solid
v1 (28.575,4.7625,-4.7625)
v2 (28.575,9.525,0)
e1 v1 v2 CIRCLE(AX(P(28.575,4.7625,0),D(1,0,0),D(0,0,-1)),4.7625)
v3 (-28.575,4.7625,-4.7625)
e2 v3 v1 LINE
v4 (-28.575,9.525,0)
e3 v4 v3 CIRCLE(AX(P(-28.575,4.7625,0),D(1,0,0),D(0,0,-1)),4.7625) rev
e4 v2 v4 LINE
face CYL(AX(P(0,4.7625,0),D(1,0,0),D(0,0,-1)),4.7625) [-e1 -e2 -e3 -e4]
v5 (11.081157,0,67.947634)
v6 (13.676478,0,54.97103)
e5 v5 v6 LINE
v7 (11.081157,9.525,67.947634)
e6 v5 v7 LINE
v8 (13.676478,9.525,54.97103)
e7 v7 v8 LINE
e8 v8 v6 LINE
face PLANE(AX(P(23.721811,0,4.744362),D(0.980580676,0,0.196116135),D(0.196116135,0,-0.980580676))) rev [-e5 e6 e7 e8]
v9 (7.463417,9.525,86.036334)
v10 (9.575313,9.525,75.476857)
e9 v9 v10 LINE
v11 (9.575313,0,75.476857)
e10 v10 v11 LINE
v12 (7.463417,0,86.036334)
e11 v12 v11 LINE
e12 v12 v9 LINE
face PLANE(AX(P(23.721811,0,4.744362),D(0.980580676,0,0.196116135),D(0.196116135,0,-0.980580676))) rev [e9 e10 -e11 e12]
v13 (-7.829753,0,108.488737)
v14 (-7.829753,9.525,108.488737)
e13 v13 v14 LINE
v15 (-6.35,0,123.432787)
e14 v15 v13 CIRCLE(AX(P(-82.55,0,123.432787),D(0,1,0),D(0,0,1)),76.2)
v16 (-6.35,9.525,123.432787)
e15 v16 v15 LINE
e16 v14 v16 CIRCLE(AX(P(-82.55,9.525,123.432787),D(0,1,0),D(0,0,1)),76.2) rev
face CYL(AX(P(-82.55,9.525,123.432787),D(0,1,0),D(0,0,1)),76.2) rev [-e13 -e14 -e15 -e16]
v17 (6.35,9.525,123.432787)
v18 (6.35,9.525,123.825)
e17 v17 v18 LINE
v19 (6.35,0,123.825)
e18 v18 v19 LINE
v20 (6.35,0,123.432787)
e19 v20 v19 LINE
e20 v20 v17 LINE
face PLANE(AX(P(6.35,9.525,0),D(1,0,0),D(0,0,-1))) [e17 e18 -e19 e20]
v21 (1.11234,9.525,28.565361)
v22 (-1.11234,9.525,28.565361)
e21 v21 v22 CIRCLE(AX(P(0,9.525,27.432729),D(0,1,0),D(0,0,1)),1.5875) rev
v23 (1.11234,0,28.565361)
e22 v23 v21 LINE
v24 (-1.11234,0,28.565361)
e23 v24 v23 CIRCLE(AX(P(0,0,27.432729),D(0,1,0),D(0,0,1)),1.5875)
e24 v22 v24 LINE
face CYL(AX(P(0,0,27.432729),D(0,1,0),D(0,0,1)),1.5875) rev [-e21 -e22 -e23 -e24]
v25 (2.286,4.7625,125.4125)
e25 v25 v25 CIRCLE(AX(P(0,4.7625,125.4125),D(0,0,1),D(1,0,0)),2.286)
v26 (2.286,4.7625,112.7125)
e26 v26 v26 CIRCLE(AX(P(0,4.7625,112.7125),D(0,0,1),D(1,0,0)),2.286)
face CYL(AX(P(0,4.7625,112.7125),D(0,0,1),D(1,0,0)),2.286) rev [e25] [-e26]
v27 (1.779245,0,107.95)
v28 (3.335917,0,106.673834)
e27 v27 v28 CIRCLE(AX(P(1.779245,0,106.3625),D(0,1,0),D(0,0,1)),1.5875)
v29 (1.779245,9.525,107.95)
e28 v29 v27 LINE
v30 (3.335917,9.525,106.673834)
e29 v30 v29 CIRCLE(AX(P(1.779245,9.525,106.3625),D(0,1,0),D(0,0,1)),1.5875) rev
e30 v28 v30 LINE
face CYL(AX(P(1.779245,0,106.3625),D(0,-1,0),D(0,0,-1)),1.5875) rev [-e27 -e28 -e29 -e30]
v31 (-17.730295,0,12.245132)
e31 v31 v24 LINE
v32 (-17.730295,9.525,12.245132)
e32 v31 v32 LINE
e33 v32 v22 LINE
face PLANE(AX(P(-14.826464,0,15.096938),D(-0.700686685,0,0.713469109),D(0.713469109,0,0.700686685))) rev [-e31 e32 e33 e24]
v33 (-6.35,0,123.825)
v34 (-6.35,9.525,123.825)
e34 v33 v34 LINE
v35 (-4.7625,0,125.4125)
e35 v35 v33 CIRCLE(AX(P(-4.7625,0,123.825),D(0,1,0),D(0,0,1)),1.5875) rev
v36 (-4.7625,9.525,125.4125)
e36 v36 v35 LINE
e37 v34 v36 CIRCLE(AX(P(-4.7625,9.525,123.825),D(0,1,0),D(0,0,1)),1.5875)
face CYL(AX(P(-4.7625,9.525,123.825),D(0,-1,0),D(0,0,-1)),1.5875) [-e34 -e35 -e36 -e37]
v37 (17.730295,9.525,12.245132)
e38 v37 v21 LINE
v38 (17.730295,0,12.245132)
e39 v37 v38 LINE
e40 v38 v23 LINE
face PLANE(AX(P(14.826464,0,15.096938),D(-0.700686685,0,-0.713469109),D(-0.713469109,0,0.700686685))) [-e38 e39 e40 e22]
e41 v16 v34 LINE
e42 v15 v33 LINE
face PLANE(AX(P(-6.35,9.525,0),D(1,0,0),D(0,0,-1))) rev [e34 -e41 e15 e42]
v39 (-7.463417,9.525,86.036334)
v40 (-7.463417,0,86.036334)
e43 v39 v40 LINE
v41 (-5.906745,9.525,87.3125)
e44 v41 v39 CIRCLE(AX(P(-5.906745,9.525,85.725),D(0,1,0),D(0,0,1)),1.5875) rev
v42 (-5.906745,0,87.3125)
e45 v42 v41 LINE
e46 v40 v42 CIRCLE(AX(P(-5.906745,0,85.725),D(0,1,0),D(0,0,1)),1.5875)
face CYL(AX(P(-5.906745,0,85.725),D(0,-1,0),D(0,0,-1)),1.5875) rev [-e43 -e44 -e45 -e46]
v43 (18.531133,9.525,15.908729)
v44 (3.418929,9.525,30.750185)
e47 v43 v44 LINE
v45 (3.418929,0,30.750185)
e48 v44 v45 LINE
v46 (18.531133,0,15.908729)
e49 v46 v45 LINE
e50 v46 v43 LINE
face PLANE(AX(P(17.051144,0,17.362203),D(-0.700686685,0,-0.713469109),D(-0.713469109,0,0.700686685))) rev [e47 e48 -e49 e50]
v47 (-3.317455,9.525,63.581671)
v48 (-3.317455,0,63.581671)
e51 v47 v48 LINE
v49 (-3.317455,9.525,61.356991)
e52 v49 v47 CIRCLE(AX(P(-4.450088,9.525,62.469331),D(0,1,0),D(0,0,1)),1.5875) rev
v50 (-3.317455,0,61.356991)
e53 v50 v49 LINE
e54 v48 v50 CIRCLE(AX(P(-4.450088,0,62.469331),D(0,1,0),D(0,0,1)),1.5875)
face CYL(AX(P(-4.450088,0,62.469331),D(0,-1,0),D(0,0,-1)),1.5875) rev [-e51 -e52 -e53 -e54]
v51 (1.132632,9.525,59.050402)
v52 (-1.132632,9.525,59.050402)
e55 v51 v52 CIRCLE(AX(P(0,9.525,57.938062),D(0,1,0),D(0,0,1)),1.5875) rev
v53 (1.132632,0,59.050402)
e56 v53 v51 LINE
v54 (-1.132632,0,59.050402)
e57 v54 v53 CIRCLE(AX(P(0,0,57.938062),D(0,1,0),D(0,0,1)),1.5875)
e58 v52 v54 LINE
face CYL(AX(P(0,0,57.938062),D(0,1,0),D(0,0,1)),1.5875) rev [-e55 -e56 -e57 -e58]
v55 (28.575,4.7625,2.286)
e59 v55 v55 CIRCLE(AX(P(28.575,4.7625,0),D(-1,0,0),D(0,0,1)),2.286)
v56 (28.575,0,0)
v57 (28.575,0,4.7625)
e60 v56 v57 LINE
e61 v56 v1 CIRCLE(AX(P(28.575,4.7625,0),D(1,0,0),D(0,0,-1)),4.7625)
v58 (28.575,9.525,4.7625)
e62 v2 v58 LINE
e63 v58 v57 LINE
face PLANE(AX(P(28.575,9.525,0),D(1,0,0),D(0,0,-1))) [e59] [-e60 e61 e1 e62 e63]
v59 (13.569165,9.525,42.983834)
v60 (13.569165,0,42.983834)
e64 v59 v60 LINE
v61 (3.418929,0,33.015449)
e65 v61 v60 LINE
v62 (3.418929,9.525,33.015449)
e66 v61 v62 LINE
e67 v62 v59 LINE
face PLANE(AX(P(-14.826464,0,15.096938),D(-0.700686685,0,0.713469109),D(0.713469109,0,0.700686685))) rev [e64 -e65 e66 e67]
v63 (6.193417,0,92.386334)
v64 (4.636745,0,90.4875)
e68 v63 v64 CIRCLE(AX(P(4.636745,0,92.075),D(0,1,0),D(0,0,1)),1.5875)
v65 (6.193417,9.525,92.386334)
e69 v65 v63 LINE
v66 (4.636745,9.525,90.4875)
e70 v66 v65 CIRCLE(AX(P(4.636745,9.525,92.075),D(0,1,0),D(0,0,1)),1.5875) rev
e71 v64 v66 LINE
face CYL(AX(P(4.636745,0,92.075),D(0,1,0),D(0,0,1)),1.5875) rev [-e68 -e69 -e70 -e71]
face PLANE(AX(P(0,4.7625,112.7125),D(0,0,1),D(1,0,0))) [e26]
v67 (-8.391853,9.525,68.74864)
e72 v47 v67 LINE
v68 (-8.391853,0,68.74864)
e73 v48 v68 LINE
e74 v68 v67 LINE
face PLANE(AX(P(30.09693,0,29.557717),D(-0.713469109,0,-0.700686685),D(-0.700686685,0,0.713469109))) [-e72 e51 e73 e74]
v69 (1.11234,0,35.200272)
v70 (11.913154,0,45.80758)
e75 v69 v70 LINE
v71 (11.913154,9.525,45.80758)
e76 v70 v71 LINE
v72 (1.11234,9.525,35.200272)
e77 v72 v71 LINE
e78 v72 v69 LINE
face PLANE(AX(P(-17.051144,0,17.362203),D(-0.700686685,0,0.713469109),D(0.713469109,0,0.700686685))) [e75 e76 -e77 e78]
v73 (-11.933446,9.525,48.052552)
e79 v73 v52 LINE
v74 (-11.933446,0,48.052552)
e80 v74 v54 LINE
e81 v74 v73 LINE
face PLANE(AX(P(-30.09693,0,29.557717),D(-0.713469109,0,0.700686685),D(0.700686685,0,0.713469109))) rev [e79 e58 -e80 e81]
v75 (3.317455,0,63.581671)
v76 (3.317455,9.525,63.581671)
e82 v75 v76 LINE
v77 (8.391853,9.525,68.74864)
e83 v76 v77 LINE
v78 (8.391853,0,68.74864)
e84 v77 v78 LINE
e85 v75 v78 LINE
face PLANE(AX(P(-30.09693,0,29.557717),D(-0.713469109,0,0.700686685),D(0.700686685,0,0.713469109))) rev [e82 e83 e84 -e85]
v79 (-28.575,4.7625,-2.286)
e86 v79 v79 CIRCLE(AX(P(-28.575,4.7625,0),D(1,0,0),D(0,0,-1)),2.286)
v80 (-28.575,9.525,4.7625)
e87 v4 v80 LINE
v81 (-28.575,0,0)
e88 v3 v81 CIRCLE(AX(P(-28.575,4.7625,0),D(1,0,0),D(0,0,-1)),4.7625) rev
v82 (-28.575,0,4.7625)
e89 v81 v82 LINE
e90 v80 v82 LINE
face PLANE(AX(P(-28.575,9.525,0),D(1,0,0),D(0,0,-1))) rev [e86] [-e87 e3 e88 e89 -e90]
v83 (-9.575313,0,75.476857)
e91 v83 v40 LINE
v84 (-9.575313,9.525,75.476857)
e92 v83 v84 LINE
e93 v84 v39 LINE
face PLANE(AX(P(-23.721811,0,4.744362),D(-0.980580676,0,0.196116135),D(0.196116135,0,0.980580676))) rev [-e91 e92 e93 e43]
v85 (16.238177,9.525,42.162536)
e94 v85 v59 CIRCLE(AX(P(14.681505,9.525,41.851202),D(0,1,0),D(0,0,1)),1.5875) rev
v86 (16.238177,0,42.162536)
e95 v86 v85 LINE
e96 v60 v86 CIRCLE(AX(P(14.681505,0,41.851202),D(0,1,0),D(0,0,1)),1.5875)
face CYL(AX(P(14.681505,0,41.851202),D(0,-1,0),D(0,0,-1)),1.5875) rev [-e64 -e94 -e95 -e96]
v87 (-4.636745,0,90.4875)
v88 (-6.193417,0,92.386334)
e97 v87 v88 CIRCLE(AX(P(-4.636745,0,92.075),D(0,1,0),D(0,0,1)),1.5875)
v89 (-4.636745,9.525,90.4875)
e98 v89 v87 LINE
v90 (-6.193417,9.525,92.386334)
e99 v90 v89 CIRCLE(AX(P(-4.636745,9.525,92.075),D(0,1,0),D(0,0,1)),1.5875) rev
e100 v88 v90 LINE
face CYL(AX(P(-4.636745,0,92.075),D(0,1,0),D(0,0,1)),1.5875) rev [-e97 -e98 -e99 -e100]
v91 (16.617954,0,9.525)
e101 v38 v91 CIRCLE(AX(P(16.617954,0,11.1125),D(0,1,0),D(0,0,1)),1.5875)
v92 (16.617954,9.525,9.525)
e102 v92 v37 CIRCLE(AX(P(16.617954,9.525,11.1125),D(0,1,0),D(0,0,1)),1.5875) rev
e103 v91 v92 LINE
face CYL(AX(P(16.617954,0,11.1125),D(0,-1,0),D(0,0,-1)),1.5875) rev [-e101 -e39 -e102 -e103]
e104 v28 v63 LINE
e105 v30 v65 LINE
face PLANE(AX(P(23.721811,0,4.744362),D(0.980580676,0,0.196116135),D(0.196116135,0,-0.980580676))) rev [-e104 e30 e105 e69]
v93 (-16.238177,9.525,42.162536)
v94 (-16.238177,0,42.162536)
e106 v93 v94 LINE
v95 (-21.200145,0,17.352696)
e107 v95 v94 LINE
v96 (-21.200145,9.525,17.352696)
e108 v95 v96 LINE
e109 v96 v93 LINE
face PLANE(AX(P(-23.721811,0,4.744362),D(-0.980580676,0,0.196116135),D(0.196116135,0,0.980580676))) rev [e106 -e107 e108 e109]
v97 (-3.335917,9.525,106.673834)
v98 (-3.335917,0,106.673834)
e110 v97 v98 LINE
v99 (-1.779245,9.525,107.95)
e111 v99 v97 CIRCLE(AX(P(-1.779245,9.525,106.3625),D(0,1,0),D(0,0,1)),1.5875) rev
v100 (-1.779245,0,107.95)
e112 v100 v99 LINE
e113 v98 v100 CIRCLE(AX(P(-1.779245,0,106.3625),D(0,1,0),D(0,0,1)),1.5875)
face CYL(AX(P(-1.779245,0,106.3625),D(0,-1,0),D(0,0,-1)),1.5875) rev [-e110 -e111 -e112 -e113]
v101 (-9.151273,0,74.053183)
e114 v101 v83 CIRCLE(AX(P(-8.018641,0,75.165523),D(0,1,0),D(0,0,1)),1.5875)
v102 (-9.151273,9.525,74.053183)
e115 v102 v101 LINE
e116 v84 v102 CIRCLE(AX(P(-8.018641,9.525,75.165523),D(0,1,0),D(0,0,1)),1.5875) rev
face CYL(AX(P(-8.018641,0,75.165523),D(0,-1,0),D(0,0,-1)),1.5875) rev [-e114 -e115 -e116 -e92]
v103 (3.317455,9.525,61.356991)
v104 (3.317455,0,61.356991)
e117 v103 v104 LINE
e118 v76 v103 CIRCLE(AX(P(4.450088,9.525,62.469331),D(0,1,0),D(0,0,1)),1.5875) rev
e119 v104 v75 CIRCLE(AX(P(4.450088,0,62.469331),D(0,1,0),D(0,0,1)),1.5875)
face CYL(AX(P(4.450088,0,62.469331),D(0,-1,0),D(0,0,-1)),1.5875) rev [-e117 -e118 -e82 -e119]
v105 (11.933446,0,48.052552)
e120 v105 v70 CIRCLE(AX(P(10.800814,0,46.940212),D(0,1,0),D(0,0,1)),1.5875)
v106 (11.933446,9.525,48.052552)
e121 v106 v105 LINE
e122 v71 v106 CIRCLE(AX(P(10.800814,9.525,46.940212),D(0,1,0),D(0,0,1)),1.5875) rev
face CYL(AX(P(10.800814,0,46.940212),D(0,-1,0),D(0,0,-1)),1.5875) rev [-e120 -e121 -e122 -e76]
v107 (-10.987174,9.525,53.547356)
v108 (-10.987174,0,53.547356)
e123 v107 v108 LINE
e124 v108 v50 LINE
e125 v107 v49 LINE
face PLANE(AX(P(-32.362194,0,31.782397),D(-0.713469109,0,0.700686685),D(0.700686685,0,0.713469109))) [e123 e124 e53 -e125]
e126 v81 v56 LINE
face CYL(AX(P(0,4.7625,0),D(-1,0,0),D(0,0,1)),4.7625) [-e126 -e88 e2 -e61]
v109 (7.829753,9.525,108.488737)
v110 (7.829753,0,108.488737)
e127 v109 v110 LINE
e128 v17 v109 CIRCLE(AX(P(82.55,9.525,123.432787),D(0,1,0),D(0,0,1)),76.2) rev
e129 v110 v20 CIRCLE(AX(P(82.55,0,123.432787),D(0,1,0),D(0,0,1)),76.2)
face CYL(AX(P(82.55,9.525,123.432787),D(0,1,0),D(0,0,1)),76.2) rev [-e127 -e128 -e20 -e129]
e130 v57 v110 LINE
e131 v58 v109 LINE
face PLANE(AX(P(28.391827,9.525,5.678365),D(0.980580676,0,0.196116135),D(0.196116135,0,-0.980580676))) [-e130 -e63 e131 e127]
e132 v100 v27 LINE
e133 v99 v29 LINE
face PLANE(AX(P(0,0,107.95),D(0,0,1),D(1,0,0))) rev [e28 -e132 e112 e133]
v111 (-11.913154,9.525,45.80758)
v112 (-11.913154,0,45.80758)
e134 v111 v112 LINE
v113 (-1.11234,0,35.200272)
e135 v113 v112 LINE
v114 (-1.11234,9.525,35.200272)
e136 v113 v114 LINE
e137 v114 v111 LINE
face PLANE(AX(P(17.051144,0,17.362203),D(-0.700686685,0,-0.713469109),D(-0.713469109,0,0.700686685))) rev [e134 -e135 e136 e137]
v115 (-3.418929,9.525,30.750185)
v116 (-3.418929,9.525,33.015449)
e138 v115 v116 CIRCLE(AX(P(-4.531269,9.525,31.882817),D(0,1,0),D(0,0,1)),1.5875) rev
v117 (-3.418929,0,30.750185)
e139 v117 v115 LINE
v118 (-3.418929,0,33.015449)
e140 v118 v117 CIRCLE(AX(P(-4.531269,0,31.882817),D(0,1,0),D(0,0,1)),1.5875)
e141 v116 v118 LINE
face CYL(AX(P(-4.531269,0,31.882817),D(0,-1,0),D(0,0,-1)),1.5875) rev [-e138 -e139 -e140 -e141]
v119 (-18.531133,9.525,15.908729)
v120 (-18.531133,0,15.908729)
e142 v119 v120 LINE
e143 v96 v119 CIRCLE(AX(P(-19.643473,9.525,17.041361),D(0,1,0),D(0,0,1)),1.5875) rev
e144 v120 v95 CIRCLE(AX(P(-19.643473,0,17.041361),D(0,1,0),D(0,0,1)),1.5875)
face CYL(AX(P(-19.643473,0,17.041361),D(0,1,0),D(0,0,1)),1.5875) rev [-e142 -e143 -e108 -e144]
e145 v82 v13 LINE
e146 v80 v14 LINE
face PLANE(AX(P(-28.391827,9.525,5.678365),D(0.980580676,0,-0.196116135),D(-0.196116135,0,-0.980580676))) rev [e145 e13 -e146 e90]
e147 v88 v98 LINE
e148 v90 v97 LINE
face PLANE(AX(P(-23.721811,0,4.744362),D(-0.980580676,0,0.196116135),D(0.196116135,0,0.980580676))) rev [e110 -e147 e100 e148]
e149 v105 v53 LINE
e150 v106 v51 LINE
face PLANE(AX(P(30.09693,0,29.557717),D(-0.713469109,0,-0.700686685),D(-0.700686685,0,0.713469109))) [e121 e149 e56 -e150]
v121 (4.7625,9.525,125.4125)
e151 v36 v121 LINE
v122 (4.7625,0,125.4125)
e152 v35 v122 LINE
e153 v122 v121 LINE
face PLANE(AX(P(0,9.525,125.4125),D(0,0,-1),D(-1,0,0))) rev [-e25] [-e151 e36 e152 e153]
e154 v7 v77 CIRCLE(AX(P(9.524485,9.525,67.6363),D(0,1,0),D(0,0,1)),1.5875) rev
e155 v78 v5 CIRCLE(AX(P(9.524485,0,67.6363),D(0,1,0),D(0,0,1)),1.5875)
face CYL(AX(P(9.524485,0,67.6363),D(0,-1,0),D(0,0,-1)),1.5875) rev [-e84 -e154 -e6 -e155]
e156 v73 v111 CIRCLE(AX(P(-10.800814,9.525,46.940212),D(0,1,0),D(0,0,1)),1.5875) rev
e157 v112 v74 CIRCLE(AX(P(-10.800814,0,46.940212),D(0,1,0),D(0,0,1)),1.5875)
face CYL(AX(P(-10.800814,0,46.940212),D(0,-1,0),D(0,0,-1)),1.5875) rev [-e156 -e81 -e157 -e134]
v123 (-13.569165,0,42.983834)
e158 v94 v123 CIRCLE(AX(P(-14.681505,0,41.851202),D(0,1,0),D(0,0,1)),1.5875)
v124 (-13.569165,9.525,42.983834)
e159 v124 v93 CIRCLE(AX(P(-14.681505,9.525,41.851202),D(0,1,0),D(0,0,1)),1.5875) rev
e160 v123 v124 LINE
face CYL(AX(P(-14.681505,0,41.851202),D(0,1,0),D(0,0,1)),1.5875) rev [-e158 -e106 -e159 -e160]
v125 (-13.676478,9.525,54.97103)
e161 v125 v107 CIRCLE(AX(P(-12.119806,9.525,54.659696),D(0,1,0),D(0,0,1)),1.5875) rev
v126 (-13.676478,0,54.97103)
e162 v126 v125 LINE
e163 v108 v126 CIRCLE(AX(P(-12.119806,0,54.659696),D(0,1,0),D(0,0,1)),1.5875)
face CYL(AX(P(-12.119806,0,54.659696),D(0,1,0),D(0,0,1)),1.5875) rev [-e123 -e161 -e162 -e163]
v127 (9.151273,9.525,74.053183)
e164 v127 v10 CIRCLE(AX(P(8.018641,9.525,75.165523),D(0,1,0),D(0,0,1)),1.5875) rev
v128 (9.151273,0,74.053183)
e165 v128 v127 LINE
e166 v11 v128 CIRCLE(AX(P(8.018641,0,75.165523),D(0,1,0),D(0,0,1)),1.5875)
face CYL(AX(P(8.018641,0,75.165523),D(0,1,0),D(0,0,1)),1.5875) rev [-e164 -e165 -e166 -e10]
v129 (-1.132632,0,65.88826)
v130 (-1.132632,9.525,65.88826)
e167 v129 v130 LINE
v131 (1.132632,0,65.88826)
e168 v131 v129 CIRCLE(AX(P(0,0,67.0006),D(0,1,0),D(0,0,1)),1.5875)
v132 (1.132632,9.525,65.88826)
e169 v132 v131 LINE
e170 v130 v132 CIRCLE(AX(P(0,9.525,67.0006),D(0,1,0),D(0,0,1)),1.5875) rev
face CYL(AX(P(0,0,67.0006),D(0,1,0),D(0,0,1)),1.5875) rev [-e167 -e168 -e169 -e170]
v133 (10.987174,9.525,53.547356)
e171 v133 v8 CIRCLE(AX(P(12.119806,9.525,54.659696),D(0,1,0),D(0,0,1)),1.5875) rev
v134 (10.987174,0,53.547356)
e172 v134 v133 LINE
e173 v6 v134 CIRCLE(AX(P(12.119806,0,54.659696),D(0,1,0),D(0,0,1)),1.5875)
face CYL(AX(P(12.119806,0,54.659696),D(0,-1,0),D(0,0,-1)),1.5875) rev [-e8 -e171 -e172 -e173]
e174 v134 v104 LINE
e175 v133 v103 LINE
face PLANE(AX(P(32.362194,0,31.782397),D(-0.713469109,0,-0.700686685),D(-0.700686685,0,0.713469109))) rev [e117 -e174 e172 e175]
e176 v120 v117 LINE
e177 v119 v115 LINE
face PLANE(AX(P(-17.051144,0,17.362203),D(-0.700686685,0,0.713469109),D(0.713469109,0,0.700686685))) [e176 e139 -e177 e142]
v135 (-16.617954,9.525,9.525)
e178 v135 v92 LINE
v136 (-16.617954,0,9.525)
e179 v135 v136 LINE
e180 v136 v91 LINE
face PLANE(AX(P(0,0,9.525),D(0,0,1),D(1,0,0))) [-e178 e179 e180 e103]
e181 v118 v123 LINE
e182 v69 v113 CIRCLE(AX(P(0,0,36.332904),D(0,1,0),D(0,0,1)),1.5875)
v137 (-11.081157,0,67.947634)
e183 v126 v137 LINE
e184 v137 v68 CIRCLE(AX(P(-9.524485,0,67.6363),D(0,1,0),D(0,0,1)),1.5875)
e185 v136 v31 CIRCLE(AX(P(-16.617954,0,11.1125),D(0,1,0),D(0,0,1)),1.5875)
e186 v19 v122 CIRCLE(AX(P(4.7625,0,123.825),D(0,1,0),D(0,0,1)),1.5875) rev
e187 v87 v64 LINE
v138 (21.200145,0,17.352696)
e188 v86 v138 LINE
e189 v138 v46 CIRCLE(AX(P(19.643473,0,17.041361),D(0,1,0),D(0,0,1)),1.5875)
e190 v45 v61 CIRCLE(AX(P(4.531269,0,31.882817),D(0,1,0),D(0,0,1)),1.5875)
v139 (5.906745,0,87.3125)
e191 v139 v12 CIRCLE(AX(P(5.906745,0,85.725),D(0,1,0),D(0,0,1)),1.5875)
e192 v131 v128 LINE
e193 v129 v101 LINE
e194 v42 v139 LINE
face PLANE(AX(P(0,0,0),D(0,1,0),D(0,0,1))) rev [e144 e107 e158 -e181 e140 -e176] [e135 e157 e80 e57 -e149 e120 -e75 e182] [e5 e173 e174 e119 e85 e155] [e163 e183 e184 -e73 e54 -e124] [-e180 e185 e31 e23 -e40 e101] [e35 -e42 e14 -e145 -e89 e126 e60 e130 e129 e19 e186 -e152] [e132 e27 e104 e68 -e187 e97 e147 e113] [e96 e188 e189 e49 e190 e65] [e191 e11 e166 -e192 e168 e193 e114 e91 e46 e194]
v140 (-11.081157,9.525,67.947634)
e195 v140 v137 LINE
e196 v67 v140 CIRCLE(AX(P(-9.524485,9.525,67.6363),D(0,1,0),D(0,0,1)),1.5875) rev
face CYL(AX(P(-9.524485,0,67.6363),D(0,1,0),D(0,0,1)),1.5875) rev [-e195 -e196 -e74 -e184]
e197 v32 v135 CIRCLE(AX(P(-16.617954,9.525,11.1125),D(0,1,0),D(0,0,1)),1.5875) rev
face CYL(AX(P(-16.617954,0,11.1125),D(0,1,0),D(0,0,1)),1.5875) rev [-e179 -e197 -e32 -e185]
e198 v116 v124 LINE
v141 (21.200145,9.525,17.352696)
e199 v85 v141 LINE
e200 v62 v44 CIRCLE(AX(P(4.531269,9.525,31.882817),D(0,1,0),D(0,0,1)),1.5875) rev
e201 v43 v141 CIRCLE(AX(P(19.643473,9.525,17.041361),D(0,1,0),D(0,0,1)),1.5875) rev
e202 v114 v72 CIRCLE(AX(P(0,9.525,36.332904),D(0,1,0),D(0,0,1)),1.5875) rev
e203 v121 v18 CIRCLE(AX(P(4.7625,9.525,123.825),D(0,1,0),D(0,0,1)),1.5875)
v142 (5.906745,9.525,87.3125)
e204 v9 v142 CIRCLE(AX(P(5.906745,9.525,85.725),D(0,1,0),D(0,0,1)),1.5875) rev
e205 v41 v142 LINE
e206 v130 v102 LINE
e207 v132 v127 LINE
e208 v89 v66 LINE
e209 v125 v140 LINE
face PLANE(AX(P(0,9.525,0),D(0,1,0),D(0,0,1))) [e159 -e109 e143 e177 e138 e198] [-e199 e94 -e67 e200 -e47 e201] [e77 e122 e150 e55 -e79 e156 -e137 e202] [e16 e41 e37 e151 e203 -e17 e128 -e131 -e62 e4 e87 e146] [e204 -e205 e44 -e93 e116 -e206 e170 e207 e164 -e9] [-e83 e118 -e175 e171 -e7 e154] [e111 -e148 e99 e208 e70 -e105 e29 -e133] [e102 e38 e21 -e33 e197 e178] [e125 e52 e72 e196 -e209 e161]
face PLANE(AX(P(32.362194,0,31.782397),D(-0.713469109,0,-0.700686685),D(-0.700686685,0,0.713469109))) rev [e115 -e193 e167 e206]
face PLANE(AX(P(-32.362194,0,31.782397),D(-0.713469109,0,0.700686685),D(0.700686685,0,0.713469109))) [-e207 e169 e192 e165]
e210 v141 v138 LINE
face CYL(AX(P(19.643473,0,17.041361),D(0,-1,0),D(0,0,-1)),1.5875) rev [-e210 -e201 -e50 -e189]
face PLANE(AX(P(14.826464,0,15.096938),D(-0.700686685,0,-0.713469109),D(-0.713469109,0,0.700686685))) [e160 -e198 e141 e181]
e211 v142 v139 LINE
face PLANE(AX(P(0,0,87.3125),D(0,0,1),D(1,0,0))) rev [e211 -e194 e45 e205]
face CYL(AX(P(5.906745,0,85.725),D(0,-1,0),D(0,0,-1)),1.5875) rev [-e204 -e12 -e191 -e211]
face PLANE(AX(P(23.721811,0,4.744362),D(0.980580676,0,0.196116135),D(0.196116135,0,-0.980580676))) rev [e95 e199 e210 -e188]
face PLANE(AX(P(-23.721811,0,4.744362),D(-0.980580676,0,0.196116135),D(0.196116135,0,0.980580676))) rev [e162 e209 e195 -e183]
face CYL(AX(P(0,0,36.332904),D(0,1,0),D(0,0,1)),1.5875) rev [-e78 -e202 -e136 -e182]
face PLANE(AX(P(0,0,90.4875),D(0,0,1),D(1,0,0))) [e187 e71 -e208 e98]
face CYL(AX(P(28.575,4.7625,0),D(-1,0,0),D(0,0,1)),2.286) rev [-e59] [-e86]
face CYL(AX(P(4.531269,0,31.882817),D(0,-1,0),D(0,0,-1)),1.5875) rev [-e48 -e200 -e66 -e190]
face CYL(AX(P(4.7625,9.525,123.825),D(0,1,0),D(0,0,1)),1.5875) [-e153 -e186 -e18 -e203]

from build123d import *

# Parameters (mm, degrees)
BOSS_EXTRUDE1_DEPTH     = 9.525
CUT_EXTRUDE2_DEPTH      = 139.148989433
CUT_EXTRUDE2_DEPTH_BACK = 139.148989433
SKETCH6_R               = 2.286
SKETCH7_R               = 2.286
CUT_EXTRUDE3_DEPTH      = 12.7
FILLET3_R               = 76.2
FILLET4_R               = 1.5875
FILLET5_R               = 4.7625
CUT_EXTRUDE4_DEPTH      = 129.978879691
CUT_EXTRUDE4_DEPTH_BACK = 129.978879691
FILLET6_R               = 1.5875


with BuildPart() as part:
    # Sketch1 → Boss-Extrude1 (new body)
    with BuildSketch(Plane(origin=(0, 0, 0), x_dir=(1, 0, 0), z_dir=(0, 1, 0))):
        Polygon((-28.575, 4.7625), (-28.575, -4.7625), (-6.35, -115.8875), (-6.35, -125.4125), (6.35, -125.4125), (6.35, -115.8875), (28.575, -4.7625), (28.575, 4.7625), align=None)
    extrude(amount=BOSS_EXTRUDE1_DEPTH)

    # Sketch6 → Cut-Extrude2 (cut, two sides: drawn at the far end of the back side and taken through both)
    with BuildSketch(Plane.ZY.offset(28.575).offset(-CUT_EXTRUDE2_DEPTH_BACK)):
        with Locations((0, 4.7625)):
            Circle(SKETCH6_R)
    extrude(amount=CUT_EXTRUDE2_DEPTH + CUT_EXTRUDE2_DEPTH_BACK, mode=Mode.SUBTRACT)

    # Sketch7 → Cut-Extrude3 (cut)
    with BuildSketch(Plane.XY.offset(125.4125)):
        with Locations((0, 4.7625)):
            Circle(SKETCH7_R)
    extrude(amount=-CUT_EXTRUDE3_DEPTH, mode=Mode.SUBTRACT)

    # Fillet3
    fillet3_edges = [part.edges().sort_by_distance(p)[0] for p in [
        (6.35, 4.7625, 115.8875),
        (-6.35, 4.7625, 115.8875),
    ]]
    fillet(fillet3_edges, radius=FILLET3_R)

    # Fillet4
    fillet4_edges = [part.edges().sort_by_distance(p)[0] for p in [
        (6.35, 4.7625, 125.4125),
        (-6.35, 4.7625, 125.4125),
    ]]
    fillet(fillet4_edges, radius=FILLET4_R)

    # Fillet5
    fillet5_edges = [part.edges().sort_by_distance(p)[0] for p in [
        (0, 0, -4.7625),
        (0, 9.525, -4.7625),
    ]]
    fillet(fillet5_edges, radius=FILLET5_R - 0.0001)  # a hair under: the kernel refuses the full size

    # Sketch8 → Cut-Extrude4 (cut, two sides: drawn at the far end of the back side and taken through both)
    with BuildSketch(Plane(origin=(0, 9.525, 0), x_dir=(1, 0, 0), z_dir=(0, 1, 0)).offset(-CUT_EXTRUDE4_DEPTH_BACK)):
        with BuildLine():
            ThreePointArc((-3.159737044, -107.554734345), (-3.120475766, -107.752318634), (-3.081706229, -107.95))
            Line((-3.081706229, -107.95), (3.081706229, -107.95))
            ThreePointArc((3.081706229, -107.95), (3.120475766, -107.752318634), (3.159737044, -107.554734345))
            Line((3.159737044, -107.554734345), (6.573183913, -90.4875))
            Line((6.573183913, -90.4875), (-6.573183913, -90.4875))
            Line((-6.573183913, -90.4875), (-3.159737044, -107.554734345))
        make_face()
        Polygon((0, -64.734965609), (-9.740127938, -74.652779875), (-7.208183913, -87.3125), (7.208183913, -87.3125), (9.740127938, -74.652779875), align=None)
        Polygon((10.493050249, -70.888168322), (14.721754664, -49.744646246), (2.225043776, -62.469331006), align=None)
        Polygon((-2.225043776, -62.469331006), (-14.721754664, -49.744646246), (-10.493050249, -70.888168322), align=None)
        Polygon((13.045786034, -46.919919878), (0, -34.107860525), (-13.045786034, -46.919919878), (0, -60.203696402), align=None)
        Polygon((-2.265634604, -31.882816749), (-22.211903335, -12.29390289), (-15.662709625, -45.03987144), align=None)
        Polygon((20.50004931, -9.525), (-20.50004931, -9.525), (0, -29.657772974), align=None)
        Polygon((15.662709625, -45.03987144), (22.211903335, -12.29390289), (2.265634604, -31.882816749), align=None)
    extrude(amount=CUT_EXTRUDE4_DEPTH + CUT_EXTRUDE4_DEPTH_BACK, mode=Mode.SUBTRACT)

    # Fillet6
    fillet6_edges = [part.edges().sort_by_distance(p)[0] for p in [
        (3.081706229, 4.7625, 107.95),
        (-3.081706229, 4.7625, 107.95),
        (-6.573183913, 4.7625, 90.4875),
        (6.573183913, 4.7625, 90.4875),
        (-15.662709625, 4.7625, 45.03987144),
        (-22.211903335, 4.7625, 12.29390289),
        (-2.265634604, 4.7625, 31.882816749),
        (2.265634604, 4.7625, 31.882816749),
        (22.211903335, 4.7625, 12.29390289),
        (15.662709625, 4.7625, 45.03987144),
        (10.493050249, 4.7625, 70.888168322),
        (2.225043776, 4.7625, 62.469331006),
        (14.721754664, 4.7625, 49.744646246),
        (9.740127938, 4.7625, 74.652779875),
        (7.208183913, 4.7625, 87.3125),
        (-7.208183913, 4.7625, 87.3125),
        (-9.740127938, 4.7625, 74.652779875),
        (13.045786034, 4.7625, 46.919919878),
        (0, 4.7625, 60.203696402),
        (-13.045786034, 4.7625, 46.919919878),
        (0, 4.7625, 34.107860525),
        (-2.225043776, 4.7625, 62.469331006),
        (-10.493050249, 4.7625, 70.888168322),
        (-14.721754664, 4.7625, 49.744646246),
        (20.50004931, 4.7625, 9.525),
        (0, 4.7625, 29.657772974),
        (-20.50004931, 4.7625, 9.525),
        (0, 4.7625, 64.734965609),
    ]]
    fillet(fillet6_edges, radius=FILLET6_R)


solid = part.part
